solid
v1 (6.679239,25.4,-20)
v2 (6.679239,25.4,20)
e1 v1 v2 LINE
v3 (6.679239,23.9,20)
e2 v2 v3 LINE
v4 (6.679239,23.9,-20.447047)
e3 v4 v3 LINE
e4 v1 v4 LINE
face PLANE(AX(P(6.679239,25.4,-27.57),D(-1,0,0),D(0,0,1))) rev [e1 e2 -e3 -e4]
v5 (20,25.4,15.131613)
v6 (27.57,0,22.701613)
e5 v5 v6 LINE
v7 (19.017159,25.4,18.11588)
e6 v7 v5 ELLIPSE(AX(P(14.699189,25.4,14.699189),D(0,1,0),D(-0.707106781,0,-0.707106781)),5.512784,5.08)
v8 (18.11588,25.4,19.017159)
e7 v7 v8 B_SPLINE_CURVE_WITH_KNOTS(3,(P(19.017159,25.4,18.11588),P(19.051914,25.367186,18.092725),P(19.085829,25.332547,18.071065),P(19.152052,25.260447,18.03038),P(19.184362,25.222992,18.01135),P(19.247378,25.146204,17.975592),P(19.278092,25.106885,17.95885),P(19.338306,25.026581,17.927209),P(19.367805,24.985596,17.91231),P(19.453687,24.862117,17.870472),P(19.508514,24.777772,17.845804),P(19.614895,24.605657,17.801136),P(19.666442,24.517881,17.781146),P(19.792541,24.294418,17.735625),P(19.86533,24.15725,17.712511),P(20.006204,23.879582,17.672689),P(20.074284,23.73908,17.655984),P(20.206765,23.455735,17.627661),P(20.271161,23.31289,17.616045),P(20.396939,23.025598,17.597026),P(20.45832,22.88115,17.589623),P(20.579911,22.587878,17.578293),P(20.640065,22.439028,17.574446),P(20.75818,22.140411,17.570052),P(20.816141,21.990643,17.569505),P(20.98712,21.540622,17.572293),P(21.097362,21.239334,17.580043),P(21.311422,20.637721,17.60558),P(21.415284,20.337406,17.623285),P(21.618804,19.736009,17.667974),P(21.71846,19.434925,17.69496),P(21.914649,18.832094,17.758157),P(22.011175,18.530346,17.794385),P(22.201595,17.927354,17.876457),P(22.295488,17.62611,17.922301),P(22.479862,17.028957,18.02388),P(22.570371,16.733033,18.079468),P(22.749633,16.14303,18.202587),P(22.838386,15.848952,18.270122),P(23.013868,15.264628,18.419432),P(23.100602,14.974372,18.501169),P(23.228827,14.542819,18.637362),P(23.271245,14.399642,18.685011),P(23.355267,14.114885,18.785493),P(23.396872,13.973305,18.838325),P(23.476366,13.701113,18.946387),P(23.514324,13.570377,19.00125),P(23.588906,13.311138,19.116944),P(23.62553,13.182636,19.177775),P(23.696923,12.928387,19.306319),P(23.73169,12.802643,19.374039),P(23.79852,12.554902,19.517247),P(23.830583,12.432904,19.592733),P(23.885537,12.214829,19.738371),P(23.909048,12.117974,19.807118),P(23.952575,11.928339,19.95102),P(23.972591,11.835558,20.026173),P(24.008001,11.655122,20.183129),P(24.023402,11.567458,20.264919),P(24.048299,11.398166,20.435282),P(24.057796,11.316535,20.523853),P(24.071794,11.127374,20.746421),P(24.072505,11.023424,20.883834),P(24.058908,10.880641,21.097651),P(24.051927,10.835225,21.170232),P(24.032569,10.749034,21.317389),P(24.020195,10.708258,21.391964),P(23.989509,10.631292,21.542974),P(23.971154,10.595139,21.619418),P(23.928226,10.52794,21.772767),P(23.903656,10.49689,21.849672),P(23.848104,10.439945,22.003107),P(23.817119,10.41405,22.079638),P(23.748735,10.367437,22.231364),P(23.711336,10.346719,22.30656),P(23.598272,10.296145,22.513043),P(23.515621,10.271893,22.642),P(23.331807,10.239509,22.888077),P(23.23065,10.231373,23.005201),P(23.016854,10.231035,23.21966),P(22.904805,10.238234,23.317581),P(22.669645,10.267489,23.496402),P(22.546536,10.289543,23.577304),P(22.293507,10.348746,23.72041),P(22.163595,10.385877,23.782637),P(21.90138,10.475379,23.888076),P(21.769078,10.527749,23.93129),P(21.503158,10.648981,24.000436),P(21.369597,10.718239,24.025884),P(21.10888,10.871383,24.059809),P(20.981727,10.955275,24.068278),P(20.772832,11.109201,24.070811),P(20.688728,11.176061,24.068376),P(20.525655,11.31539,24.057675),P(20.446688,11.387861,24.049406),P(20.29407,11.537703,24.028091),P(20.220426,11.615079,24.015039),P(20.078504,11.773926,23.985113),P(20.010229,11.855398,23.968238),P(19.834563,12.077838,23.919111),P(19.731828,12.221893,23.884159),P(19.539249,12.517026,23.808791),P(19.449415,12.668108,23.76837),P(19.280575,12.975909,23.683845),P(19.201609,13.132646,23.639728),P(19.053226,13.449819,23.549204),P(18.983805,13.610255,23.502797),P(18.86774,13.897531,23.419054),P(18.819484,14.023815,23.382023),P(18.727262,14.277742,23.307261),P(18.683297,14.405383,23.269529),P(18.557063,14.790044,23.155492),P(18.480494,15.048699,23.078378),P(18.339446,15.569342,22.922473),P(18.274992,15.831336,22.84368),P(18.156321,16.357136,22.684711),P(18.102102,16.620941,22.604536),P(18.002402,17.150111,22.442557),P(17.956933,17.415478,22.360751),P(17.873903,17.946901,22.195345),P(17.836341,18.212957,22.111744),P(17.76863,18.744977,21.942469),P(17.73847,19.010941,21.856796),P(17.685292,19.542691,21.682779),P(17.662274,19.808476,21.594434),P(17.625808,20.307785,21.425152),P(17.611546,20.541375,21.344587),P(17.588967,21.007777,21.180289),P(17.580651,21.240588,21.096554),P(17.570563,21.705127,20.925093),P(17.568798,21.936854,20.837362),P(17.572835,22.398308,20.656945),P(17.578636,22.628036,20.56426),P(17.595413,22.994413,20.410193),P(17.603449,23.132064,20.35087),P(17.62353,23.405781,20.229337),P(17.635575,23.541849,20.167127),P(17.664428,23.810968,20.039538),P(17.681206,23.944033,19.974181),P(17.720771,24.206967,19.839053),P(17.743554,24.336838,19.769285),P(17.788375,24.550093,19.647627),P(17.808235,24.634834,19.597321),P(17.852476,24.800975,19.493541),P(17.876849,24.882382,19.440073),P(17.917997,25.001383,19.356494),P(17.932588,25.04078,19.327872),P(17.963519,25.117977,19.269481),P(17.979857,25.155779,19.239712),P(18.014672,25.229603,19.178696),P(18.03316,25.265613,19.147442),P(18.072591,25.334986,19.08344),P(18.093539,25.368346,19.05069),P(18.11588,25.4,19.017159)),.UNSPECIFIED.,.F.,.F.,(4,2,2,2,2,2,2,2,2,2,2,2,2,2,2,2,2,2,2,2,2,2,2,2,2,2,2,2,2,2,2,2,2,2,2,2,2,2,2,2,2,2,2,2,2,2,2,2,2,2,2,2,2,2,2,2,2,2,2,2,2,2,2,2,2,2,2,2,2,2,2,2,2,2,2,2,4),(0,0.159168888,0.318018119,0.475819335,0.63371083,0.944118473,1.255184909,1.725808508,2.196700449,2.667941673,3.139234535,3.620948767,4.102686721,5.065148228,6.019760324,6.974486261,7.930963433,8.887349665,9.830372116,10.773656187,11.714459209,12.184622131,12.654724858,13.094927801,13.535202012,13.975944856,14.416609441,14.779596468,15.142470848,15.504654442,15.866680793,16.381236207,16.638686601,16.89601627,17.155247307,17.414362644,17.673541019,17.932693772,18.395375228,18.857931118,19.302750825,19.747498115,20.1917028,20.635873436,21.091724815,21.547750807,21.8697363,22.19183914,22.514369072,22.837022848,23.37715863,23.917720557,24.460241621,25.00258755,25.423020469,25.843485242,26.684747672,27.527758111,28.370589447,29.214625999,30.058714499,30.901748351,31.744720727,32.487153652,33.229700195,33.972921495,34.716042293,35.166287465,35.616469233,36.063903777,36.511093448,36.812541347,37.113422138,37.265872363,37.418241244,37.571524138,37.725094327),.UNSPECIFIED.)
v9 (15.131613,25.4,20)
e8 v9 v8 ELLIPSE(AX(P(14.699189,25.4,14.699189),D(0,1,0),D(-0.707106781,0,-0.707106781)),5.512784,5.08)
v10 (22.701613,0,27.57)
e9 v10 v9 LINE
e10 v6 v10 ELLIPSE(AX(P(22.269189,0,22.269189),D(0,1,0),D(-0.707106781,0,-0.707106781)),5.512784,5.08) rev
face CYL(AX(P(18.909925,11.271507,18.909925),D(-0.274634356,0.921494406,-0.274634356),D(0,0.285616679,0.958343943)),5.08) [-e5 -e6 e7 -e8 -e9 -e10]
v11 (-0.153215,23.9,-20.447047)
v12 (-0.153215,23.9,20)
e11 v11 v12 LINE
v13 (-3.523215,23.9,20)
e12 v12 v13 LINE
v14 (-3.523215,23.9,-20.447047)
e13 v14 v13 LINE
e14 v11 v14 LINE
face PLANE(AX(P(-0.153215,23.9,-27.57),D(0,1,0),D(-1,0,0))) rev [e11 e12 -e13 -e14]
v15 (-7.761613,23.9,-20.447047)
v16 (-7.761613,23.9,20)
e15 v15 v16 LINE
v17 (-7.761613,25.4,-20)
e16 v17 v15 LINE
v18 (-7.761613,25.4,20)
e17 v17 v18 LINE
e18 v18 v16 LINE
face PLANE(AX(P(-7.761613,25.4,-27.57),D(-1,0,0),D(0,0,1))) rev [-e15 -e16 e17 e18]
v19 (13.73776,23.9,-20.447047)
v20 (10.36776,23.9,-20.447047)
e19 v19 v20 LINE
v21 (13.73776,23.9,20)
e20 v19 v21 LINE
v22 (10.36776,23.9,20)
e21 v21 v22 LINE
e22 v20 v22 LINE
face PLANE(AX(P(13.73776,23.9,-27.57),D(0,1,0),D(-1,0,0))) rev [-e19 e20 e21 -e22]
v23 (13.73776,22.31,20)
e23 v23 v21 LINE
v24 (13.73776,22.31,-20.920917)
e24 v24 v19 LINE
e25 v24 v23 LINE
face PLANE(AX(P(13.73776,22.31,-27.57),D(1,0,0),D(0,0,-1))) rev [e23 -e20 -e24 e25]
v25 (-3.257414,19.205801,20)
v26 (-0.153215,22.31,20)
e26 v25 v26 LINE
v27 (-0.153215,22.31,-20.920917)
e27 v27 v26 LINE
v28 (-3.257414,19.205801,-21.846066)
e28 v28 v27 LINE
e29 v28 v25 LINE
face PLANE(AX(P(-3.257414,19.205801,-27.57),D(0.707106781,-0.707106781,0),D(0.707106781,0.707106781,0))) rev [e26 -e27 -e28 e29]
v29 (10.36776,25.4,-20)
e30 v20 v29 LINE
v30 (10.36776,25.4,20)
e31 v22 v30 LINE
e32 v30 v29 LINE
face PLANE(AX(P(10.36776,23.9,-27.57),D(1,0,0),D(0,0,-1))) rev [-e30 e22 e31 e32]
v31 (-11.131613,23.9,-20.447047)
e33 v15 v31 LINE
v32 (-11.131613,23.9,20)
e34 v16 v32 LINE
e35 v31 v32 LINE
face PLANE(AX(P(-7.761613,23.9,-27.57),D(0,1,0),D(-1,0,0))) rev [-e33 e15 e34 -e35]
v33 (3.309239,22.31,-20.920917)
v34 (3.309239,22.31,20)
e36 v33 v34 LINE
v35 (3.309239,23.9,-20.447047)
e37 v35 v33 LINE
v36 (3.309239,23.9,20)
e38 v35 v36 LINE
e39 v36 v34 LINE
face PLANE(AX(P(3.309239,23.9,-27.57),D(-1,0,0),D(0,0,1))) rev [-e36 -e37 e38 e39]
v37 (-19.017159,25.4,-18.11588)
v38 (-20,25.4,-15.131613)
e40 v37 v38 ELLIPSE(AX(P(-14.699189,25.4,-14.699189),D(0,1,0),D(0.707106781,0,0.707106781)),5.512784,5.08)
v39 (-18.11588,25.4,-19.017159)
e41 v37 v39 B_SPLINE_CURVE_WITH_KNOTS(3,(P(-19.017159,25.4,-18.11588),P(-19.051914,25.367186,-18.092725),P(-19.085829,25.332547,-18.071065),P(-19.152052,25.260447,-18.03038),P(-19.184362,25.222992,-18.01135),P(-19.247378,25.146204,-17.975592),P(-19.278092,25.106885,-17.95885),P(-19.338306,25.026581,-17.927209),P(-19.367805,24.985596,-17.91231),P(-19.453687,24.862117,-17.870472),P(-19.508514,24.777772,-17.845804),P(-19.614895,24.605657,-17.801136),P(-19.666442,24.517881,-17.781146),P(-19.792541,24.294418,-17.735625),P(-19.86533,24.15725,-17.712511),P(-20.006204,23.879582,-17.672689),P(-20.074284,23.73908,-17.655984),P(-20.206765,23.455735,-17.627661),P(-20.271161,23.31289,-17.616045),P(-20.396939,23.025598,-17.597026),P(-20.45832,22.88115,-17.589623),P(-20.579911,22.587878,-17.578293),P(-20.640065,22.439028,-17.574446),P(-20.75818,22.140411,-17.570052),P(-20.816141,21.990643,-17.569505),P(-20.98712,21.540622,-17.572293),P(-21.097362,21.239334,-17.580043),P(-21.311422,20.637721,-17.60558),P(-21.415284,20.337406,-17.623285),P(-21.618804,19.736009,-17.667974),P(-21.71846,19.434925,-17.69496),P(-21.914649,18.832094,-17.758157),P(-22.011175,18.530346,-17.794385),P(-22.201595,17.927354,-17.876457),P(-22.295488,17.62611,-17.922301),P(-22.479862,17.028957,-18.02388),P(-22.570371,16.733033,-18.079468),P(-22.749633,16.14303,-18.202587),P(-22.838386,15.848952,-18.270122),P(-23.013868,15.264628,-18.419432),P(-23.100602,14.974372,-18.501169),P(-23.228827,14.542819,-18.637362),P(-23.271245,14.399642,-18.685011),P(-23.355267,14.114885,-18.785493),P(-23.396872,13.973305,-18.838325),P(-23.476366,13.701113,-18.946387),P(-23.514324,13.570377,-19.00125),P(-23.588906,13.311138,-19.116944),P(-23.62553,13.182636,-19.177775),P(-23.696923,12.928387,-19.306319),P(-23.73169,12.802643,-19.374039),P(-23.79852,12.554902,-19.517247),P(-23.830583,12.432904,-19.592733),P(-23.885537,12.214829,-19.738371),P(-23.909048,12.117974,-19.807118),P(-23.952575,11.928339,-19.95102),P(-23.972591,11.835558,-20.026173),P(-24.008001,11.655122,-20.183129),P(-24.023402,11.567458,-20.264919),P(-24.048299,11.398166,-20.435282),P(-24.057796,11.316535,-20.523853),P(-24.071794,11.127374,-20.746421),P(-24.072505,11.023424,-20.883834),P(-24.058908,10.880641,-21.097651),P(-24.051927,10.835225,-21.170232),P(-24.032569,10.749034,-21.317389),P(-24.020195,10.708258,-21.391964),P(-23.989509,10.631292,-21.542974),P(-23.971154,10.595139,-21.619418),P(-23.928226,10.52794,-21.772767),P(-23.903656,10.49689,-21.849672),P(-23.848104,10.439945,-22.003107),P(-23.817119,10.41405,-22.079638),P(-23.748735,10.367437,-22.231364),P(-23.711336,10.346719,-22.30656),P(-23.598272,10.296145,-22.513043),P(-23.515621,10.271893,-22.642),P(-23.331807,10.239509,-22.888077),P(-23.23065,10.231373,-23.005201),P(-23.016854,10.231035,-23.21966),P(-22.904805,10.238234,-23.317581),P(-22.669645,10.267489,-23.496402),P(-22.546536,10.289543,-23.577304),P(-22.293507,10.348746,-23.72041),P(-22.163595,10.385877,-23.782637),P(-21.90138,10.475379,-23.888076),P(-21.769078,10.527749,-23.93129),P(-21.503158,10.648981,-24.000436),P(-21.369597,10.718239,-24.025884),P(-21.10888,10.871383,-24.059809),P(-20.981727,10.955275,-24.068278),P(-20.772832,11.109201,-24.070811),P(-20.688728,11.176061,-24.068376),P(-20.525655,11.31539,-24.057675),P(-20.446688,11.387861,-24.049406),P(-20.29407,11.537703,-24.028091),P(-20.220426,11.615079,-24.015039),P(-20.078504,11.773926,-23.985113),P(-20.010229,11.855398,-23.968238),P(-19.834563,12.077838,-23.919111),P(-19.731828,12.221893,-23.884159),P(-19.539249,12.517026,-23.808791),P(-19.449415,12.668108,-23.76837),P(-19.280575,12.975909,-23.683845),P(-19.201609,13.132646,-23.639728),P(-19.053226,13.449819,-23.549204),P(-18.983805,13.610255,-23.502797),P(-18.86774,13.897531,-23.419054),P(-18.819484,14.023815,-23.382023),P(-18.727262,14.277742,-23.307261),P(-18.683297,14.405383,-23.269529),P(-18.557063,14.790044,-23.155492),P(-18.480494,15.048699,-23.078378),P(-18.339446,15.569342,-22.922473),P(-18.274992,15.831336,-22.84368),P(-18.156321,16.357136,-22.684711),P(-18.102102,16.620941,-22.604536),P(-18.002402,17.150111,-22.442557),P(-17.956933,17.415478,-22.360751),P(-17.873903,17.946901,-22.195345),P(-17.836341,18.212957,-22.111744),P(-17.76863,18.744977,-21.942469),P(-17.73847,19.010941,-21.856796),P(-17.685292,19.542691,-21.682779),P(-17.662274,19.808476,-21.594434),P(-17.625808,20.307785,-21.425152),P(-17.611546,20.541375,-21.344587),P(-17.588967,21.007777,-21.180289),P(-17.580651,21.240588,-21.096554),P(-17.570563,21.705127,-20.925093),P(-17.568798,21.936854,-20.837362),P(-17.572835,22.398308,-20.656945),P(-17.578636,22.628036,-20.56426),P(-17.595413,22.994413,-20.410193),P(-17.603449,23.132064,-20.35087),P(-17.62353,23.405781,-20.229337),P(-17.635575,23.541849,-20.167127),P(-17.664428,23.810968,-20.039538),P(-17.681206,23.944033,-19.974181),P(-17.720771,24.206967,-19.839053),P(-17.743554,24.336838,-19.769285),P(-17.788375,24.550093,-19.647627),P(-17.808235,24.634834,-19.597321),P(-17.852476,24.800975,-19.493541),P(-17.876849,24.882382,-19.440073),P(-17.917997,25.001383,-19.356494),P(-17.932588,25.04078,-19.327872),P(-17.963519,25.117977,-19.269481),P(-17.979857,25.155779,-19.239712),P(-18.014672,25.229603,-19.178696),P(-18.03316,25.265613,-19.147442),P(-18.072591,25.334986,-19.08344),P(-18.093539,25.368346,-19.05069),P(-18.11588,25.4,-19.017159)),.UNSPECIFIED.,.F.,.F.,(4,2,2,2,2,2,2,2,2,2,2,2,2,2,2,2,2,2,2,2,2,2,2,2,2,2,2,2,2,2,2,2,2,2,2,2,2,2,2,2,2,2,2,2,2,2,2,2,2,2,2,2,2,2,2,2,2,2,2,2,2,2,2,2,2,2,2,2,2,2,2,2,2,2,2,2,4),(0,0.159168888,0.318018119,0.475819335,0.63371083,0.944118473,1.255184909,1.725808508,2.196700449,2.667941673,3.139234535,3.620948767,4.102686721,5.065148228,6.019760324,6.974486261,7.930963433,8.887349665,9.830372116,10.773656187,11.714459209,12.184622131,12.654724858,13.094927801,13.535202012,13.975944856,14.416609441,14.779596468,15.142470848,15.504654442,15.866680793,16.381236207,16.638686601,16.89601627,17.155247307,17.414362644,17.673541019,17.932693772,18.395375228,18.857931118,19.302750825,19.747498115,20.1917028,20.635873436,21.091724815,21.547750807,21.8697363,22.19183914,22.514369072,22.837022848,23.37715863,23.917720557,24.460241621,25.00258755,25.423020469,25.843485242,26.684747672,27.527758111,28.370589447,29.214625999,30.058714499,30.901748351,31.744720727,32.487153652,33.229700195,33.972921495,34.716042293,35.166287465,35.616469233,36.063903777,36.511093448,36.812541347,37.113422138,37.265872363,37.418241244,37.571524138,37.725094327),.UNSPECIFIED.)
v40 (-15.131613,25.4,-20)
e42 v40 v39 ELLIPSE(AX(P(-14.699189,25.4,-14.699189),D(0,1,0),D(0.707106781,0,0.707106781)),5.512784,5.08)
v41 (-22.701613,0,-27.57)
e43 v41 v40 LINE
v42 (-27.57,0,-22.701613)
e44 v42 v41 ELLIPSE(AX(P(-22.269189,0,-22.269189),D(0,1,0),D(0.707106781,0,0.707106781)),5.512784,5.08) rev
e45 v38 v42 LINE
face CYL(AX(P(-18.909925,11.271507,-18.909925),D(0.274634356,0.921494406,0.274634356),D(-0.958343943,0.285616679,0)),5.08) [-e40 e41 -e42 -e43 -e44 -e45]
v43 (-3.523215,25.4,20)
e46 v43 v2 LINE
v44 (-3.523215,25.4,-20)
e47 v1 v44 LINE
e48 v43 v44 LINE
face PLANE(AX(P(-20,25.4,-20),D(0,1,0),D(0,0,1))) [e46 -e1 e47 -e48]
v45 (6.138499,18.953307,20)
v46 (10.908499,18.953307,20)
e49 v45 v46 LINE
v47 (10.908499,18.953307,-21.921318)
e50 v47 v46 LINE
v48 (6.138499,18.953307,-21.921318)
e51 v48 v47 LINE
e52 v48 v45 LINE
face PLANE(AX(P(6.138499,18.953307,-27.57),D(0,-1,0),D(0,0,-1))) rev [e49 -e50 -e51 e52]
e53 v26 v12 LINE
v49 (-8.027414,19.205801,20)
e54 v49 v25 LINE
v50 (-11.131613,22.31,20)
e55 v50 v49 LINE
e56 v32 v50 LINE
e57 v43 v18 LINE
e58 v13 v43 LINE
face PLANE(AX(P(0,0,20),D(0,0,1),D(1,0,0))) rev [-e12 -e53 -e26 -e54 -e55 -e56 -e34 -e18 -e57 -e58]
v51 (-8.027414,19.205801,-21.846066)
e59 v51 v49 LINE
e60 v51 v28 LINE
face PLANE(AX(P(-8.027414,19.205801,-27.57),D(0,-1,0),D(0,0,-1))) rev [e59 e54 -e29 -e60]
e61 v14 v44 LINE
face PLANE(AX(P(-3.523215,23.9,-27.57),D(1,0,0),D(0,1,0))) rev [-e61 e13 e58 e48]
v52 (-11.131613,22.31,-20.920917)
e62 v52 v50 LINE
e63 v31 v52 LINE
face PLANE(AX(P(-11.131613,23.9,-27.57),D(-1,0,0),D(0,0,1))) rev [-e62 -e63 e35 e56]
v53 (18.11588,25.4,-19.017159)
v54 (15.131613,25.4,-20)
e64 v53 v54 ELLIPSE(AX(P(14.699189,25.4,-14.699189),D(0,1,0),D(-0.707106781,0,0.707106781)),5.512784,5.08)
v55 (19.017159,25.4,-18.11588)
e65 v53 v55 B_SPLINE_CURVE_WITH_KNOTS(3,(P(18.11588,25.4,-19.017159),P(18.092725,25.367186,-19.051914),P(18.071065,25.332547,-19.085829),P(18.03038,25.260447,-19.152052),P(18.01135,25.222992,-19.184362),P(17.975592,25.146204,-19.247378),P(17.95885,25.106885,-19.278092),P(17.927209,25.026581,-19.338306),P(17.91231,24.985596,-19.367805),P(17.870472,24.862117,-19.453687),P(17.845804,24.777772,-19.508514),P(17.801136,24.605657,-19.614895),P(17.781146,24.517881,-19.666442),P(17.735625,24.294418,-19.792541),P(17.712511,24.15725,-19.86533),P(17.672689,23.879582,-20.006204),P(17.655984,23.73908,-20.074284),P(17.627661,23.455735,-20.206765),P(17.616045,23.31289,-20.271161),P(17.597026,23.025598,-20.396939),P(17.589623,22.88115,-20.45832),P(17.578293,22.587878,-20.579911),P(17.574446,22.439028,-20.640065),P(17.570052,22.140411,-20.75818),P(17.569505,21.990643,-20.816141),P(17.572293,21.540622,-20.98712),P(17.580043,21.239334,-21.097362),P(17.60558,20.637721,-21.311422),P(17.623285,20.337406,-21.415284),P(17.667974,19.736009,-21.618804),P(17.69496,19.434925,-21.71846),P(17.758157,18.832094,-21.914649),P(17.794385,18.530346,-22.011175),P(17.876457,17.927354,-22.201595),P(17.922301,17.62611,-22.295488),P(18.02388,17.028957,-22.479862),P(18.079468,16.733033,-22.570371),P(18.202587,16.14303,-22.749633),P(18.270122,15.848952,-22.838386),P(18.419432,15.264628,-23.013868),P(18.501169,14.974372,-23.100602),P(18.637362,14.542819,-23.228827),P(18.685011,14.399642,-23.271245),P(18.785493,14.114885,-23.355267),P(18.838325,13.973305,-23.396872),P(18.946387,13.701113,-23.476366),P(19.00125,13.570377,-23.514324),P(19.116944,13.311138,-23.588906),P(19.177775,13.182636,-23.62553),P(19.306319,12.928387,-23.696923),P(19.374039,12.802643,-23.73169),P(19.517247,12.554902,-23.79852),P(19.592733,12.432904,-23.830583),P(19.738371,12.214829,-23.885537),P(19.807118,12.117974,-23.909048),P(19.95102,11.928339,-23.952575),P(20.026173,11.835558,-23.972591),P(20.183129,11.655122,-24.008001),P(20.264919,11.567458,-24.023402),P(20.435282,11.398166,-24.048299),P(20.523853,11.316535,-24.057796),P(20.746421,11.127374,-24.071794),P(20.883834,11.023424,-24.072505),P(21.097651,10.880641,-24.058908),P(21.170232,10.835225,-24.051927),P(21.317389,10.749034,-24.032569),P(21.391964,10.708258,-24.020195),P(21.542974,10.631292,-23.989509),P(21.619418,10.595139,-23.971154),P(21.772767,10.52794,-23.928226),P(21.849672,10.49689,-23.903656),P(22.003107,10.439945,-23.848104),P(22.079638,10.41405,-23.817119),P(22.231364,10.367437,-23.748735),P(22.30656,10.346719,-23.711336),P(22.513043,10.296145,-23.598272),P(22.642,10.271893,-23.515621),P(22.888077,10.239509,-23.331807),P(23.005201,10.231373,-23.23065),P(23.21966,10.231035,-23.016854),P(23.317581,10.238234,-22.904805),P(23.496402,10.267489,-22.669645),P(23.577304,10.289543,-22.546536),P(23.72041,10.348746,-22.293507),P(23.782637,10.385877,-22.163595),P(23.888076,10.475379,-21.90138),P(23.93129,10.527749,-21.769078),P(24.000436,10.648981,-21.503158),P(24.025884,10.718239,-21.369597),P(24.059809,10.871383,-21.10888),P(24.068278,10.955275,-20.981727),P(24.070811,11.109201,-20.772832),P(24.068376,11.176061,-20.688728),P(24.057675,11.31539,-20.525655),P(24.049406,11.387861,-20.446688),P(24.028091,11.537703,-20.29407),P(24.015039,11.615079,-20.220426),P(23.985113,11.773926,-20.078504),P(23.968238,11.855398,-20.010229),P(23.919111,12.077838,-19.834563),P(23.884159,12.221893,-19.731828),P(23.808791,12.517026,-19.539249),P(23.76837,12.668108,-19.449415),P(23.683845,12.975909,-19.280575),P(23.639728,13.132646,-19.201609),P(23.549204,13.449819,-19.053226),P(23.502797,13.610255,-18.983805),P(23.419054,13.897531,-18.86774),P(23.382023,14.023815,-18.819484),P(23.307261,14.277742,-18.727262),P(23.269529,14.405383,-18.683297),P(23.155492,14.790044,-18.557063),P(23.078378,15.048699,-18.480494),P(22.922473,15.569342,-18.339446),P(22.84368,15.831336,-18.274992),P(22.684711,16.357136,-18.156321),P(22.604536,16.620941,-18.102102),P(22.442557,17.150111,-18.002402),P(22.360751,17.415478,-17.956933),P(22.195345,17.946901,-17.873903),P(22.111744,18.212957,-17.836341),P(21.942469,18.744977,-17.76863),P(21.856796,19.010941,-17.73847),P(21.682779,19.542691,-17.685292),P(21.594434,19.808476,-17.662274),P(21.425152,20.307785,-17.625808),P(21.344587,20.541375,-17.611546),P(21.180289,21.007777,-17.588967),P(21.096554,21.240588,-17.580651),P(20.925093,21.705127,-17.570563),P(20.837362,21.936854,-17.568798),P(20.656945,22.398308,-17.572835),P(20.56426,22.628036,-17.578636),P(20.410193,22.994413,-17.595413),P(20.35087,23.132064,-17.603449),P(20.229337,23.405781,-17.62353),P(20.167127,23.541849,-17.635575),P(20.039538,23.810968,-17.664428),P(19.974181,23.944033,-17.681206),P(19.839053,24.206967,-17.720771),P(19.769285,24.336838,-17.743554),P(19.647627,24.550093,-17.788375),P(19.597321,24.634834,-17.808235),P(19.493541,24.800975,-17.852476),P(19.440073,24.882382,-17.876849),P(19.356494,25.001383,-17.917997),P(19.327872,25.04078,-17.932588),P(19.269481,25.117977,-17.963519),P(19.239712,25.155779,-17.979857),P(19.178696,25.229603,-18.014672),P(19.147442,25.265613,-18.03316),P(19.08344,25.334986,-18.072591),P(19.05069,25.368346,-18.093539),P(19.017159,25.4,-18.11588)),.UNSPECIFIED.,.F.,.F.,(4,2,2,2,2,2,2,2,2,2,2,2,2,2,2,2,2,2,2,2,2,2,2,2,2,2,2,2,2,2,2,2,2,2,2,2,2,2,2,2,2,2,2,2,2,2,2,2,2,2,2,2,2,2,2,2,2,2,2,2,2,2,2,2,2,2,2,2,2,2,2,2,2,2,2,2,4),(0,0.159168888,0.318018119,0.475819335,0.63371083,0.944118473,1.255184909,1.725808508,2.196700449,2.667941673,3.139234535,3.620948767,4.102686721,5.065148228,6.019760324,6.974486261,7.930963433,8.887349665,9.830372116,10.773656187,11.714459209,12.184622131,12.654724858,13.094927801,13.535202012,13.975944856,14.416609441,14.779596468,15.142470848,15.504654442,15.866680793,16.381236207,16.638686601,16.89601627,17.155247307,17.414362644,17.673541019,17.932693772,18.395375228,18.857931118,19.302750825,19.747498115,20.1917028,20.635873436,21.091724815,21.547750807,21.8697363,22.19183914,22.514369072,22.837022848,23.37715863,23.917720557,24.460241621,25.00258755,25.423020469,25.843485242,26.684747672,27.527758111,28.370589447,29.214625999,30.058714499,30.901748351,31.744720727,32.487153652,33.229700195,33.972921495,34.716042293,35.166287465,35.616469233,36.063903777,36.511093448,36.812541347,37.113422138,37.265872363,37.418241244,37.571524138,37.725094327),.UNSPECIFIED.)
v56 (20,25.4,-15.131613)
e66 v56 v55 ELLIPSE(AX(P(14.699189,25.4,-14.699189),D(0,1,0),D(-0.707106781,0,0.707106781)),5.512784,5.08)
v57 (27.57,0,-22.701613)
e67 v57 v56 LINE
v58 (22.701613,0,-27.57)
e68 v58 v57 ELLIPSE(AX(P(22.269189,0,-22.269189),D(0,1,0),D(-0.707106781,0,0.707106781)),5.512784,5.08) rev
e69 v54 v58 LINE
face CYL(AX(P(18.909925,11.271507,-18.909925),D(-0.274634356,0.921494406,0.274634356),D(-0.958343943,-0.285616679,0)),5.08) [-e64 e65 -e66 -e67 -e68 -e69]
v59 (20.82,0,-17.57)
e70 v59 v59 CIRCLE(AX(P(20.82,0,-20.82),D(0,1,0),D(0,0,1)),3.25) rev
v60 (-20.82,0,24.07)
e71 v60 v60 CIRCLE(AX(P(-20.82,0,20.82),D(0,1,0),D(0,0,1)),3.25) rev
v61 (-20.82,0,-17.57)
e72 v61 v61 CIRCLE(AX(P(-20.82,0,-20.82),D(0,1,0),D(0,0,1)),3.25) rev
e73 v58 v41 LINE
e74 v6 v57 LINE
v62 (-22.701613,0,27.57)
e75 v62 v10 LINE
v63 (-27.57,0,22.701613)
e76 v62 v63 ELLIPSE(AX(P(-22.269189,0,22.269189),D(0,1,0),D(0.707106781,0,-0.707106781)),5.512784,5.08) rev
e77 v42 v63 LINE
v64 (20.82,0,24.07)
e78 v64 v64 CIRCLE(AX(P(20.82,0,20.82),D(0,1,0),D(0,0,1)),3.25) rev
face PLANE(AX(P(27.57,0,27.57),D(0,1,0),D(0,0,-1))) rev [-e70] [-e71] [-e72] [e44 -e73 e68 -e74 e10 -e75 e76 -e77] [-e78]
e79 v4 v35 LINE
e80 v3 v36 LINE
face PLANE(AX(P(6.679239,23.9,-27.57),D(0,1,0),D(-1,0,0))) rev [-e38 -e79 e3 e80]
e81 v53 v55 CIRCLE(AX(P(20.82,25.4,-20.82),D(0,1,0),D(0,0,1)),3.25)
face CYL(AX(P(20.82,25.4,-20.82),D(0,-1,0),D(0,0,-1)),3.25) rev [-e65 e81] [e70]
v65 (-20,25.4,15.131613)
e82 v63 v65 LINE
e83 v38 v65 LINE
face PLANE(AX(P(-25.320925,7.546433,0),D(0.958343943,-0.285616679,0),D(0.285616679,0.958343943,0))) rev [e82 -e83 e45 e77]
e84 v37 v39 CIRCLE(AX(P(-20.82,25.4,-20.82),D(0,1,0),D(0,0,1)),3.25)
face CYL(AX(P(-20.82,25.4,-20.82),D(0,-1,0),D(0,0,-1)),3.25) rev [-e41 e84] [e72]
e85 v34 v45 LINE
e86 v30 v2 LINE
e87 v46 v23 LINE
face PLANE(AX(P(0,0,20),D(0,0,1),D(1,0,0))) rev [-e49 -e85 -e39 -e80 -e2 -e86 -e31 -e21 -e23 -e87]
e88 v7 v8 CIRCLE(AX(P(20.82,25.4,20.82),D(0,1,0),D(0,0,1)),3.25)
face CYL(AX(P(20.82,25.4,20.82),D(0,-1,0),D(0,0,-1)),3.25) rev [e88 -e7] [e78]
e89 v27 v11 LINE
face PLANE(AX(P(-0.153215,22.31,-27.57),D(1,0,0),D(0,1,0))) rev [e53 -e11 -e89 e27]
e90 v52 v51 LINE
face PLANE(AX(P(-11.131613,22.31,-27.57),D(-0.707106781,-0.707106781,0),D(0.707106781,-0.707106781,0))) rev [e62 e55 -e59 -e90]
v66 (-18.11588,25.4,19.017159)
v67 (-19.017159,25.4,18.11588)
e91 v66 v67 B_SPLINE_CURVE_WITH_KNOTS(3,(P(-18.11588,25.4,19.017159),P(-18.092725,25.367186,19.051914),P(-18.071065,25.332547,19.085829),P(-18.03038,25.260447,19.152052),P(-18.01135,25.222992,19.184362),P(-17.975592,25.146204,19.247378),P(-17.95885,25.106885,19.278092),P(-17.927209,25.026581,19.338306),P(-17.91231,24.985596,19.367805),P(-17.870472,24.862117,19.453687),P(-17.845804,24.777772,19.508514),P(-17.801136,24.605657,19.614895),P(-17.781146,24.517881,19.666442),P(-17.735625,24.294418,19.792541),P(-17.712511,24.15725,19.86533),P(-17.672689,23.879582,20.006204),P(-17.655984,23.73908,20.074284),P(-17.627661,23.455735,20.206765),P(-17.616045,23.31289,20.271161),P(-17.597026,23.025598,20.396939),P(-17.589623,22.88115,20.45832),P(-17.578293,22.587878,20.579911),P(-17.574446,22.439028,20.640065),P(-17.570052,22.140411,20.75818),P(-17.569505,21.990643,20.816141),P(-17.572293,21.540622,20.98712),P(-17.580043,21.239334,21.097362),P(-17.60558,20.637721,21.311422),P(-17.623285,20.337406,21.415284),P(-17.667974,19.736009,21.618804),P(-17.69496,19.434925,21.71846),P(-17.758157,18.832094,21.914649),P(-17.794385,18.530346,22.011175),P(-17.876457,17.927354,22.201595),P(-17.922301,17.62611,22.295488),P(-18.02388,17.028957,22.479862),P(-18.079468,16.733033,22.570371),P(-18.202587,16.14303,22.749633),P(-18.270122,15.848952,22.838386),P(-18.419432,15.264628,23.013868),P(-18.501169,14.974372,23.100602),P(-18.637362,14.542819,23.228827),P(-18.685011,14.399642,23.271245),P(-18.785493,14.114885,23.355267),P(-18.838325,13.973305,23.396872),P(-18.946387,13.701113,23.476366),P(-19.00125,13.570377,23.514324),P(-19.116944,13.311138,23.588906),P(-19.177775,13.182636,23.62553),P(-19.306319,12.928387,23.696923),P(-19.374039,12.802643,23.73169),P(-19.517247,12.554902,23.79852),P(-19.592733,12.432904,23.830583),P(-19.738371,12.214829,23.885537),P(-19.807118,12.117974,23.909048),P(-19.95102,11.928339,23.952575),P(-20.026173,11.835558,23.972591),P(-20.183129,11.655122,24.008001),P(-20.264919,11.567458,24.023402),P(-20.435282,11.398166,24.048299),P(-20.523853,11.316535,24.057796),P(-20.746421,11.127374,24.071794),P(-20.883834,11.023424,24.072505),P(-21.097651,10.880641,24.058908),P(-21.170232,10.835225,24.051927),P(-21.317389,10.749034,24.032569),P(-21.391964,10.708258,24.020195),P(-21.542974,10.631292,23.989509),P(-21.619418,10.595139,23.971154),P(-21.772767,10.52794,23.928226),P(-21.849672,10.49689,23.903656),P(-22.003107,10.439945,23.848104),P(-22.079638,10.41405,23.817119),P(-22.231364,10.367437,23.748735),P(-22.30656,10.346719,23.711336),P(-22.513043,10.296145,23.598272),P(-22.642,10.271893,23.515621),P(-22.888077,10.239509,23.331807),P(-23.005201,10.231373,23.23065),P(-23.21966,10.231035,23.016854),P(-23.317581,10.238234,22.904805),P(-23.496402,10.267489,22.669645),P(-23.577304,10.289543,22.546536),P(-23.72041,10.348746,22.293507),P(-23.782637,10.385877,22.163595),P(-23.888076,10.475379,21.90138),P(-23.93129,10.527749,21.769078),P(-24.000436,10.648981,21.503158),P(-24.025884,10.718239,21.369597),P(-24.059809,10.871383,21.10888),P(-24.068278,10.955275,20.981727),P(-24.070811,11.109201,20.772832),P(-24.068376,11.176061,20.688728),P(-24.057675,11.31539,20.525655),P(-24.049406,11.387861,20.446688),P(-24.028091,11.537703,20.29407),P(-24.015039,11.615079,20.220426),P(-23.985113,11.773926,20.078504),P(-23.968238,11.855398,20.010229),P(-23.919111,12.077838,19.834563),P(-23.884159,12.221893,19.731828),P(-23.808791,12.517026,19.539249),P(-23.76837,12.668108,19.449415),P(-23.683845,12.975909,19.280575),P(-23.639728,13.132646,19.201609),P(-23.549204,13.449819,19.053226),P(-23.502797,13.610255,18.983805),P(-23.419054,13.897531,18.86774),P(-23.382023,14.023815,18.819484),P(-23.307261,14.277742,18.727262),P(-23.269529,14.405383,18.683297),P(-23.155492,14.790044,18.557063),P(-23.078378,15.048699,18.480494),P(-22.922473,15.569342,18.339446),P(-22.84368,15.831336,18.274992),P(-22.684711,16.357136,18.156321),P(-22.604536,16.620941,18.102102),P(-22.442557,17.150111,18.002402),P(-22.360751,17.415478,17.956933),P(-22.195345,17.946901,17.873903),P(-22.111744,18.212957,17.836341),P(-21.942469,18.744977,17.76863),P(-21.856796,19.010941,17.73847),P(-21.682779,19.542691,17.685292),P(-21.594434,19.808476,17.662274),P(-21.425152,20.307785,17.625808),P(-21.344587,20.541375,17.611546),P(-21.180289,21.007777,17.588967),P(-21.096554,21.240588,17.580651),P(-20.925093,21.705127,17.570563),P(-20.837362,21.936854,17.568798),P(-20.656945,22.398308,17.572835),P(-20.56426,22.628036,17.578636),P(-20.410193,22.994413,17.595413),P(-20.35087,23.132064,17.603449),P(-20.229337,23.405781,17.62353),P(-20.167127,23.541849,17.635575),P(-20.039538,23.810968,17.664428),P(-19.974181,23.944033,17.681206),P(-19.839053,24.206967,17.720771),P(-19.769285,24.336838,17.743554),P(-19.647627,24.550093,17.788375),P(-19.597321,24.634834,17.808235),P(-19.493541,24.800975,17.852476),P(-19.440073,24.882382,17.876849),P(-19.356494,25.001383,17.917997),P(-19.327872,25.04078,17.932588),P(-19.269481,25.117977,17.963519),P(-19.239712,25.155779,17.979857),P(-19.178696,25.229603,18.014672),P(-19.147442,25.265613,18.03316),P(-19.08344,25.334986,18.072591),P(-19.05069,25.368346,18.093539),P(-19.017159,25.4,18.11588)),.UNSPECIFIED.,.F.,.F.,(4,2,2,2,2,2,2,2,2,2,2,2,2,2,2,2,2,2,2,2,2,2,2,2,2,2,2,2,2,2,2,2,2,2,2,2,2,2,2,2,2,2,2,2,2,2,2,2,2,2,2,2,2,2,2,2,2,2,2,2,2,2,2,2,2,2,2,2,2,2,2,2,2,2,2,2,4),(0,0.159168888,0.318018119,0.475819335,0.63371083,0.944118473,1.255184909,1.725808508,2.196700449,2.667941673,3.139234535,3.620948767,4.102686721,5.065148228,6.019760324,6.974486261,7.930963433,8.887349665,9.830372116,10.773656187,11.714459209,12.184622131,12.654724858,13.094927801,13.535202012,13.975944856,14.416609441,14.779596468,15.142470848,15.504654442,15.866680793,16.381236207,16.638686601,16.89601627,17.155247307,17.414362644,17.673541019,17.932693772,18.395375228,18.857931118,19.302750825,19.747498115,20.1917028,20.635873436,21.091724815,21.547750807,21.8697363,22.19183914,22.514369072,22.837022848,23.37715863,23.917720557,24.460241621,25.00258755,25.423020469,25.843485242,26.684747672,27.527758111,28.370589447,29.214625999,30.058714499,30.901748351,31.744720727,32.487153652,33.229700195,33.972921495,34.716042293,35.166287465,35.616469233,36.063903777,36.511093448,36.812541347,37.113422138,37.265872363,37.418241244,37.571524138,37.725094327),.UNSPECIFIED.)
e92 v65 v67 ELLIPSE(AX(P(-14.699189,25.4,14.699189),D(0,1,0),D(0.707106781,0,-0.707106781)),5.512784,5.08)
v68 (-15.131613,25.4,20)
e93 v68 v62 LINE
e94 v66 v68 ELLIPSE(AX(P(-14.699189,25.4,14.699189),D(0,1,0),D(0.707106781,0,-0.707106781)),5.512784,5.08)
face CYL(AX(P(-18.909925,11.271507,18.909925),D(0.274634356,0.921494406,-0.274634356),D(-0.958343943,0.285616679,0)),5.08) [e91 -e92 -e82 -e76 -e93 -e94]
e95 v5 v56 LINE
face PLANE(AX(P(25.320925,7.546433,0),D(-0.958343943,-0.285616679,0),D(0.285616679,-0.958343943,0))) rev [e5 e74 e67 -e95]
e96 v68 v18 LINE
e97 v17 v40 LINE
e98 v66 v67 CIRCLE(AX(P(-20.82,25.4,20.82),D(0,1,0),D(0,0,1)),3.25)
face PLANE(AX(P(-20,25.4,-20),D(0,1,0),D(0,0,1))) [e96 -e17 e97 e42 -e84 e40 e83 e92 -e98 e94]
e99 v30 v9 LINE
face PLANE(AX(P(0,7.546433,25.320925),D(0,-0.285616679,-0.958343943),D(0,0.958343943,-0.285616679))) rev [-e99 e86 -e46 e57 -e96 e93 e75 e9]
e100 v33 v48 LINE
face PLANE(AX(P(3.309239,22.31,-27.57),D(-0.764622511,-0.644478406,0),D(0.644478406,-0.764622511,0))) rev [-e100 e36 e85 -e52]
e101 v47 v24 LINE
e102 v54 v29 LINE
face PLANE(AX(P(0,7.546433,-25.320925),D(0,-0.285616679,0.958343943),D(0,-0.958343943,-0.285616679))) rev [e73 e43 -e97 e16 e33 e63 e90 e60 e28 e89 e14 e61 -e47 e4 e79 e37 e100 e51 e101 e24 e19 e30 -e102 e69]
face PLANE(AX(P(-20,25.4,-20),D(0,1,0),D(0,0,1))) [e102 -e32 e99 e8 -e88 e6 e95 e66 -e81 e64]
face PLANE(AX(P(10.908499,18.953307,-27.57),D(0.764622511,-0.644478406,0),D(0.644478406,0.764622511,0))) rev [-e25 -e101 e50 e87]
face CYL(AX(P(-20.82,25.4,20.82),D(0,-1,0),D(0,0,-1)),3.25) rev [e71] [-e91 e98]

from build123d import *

# Parameters (mm, degrees)
SURFACE_FILL2_OUTLINE_W = 40
SURFACE_FILL2_OUTLINE_H = 40
SURFACE_FILL2_DEPTH     = 25.4
SURFACE_FILL2_DRAFT     = 16.595714
FILLET2_R               = 5.08
CUT_EXTRUDE3_DEPTH      = 47.53353416
CUT_EXTRUDE3_DEPTH_BACK = 47.53353416
SKETCH11_R              = 3.25
CUT_EXTRUDE4_START      = -41.921317507
CUT_EXTRUDE4_DEPTH      = 41.921317507


# Read off the part's stored shape, not the designer's step: Surface-Fill2, Cut-Extrude4
with BuildPart() as part:
    # Surface-Fill2 outline → Surface-Fill2 (with draft: the straight prism first)
    with BuildSketch(Plane(origin=(0, 25.4, 0), x_dir=(1, 0, 0), z_dir=(0, 1, 0))):
        Rectangle(SURFACE_FILL2_OUTLINE_W, SURFACE_FILL2_OUTLINE_H)
    extrude(amount=-SURFACE_FILL2_DEPTH)
    # Surface-Fill2: the draft: its side faces are tilted about the plane it starts from
    surface_fill2_sides = [part.faces().sort_by_distance(p)[0] for p in [
        (-20, 12.7, 0),
        (0, 12.7, 20),
        (20, 12.7, 0),
        (0, 12.7, -20),
    ]]
    draft(surface_fill2_sides, Plane(origin=(0, 25.4, 0), x_dir=(1, 0, 0), z_dir=(0, 1, 0)), SURFACE_FILL2_DRAFT)

    # Fillet2
    fillet2_edges = [part.edges().sort_by_distance(p)[0] for p in [
        (23.785000007, 12.7, -23.785000007),
        (23.785000007, 12.7, 23.785000007),
        (-23.785000007, 12.7, -23.785000007),
        (-23.785000007, 12.7, 23.785000007),
    ]]
    fillet(fillet2_edges, radius=FILLET2_R)

    # Sketch11 → Cut-Extrude3 (cut, two sides: drawn at the far end of the back side and taken through both)
    with BuildSketch(Plane(origin=(0, 0, 0), x_dir=(1, 0, 0), z_dir=(0, 1, 0)).offset(-CUT_EXTRUDE3_DEPTH_BACK)):
        with Locations(Location((-20.82, 20.82, 0), (0, 0, 326.308545858))):
            Circle(SKETCH11_R)
        with Locations(Location((20.82, 20.82, 0), (0, 0, 213.691454142))):
            Circle(SKETCH11_R)
        with Locations(Location((-20.82, -20.82, 0), (0, 0, 56.308545858))):
            Circle(SKETCH11_R)
        with Locations(Location((20.82, -20.82, 0), (0, 0, 123.691454142))):
            Circle(SKETCH11_R)
    extrude(amount=CUT_EXTRUDE3_DEPTH + CUT_EXTRUDE3_DEPTH_BACK, mode=Mode.SUBTRACT)

    # Cut-Extrude4 outline → Cut-Extrude4 (cut)
    with BuildSketch(Plane.XY.offset(20).offset(CUT_EXTRUDE4_START)):
        Polygon((13.737759609, 22.31), (13.737759609, 23.9), (10.367759609, 23.9), (10.367759609, 25.4), (6.679239208, 25.4), (6.679239208, 23.9), (3.309239208, 23.9), (3.309239208, 22.31), (6.138499409, 18.953307175), (10.908499409, 18.953307175), align=None)
        Polygon((-3.523215232, 23.9), (-3.523215232, 25.4), (-7.761612771, 25.4), (-7.761612771, 23.9), (-11.131612771, 23.9), (-11.131612771, 22.31), (-8.027414001, 19.205801231), (-3.257414001, 19.205801231), (-0.153215232, 22.31), (-0.153215232, 23.9), align=None)
    extrude(amount=CUT_EXTRUDE4_DEPTH, mode=Mode.SUBTRACT)


solid = part.part
